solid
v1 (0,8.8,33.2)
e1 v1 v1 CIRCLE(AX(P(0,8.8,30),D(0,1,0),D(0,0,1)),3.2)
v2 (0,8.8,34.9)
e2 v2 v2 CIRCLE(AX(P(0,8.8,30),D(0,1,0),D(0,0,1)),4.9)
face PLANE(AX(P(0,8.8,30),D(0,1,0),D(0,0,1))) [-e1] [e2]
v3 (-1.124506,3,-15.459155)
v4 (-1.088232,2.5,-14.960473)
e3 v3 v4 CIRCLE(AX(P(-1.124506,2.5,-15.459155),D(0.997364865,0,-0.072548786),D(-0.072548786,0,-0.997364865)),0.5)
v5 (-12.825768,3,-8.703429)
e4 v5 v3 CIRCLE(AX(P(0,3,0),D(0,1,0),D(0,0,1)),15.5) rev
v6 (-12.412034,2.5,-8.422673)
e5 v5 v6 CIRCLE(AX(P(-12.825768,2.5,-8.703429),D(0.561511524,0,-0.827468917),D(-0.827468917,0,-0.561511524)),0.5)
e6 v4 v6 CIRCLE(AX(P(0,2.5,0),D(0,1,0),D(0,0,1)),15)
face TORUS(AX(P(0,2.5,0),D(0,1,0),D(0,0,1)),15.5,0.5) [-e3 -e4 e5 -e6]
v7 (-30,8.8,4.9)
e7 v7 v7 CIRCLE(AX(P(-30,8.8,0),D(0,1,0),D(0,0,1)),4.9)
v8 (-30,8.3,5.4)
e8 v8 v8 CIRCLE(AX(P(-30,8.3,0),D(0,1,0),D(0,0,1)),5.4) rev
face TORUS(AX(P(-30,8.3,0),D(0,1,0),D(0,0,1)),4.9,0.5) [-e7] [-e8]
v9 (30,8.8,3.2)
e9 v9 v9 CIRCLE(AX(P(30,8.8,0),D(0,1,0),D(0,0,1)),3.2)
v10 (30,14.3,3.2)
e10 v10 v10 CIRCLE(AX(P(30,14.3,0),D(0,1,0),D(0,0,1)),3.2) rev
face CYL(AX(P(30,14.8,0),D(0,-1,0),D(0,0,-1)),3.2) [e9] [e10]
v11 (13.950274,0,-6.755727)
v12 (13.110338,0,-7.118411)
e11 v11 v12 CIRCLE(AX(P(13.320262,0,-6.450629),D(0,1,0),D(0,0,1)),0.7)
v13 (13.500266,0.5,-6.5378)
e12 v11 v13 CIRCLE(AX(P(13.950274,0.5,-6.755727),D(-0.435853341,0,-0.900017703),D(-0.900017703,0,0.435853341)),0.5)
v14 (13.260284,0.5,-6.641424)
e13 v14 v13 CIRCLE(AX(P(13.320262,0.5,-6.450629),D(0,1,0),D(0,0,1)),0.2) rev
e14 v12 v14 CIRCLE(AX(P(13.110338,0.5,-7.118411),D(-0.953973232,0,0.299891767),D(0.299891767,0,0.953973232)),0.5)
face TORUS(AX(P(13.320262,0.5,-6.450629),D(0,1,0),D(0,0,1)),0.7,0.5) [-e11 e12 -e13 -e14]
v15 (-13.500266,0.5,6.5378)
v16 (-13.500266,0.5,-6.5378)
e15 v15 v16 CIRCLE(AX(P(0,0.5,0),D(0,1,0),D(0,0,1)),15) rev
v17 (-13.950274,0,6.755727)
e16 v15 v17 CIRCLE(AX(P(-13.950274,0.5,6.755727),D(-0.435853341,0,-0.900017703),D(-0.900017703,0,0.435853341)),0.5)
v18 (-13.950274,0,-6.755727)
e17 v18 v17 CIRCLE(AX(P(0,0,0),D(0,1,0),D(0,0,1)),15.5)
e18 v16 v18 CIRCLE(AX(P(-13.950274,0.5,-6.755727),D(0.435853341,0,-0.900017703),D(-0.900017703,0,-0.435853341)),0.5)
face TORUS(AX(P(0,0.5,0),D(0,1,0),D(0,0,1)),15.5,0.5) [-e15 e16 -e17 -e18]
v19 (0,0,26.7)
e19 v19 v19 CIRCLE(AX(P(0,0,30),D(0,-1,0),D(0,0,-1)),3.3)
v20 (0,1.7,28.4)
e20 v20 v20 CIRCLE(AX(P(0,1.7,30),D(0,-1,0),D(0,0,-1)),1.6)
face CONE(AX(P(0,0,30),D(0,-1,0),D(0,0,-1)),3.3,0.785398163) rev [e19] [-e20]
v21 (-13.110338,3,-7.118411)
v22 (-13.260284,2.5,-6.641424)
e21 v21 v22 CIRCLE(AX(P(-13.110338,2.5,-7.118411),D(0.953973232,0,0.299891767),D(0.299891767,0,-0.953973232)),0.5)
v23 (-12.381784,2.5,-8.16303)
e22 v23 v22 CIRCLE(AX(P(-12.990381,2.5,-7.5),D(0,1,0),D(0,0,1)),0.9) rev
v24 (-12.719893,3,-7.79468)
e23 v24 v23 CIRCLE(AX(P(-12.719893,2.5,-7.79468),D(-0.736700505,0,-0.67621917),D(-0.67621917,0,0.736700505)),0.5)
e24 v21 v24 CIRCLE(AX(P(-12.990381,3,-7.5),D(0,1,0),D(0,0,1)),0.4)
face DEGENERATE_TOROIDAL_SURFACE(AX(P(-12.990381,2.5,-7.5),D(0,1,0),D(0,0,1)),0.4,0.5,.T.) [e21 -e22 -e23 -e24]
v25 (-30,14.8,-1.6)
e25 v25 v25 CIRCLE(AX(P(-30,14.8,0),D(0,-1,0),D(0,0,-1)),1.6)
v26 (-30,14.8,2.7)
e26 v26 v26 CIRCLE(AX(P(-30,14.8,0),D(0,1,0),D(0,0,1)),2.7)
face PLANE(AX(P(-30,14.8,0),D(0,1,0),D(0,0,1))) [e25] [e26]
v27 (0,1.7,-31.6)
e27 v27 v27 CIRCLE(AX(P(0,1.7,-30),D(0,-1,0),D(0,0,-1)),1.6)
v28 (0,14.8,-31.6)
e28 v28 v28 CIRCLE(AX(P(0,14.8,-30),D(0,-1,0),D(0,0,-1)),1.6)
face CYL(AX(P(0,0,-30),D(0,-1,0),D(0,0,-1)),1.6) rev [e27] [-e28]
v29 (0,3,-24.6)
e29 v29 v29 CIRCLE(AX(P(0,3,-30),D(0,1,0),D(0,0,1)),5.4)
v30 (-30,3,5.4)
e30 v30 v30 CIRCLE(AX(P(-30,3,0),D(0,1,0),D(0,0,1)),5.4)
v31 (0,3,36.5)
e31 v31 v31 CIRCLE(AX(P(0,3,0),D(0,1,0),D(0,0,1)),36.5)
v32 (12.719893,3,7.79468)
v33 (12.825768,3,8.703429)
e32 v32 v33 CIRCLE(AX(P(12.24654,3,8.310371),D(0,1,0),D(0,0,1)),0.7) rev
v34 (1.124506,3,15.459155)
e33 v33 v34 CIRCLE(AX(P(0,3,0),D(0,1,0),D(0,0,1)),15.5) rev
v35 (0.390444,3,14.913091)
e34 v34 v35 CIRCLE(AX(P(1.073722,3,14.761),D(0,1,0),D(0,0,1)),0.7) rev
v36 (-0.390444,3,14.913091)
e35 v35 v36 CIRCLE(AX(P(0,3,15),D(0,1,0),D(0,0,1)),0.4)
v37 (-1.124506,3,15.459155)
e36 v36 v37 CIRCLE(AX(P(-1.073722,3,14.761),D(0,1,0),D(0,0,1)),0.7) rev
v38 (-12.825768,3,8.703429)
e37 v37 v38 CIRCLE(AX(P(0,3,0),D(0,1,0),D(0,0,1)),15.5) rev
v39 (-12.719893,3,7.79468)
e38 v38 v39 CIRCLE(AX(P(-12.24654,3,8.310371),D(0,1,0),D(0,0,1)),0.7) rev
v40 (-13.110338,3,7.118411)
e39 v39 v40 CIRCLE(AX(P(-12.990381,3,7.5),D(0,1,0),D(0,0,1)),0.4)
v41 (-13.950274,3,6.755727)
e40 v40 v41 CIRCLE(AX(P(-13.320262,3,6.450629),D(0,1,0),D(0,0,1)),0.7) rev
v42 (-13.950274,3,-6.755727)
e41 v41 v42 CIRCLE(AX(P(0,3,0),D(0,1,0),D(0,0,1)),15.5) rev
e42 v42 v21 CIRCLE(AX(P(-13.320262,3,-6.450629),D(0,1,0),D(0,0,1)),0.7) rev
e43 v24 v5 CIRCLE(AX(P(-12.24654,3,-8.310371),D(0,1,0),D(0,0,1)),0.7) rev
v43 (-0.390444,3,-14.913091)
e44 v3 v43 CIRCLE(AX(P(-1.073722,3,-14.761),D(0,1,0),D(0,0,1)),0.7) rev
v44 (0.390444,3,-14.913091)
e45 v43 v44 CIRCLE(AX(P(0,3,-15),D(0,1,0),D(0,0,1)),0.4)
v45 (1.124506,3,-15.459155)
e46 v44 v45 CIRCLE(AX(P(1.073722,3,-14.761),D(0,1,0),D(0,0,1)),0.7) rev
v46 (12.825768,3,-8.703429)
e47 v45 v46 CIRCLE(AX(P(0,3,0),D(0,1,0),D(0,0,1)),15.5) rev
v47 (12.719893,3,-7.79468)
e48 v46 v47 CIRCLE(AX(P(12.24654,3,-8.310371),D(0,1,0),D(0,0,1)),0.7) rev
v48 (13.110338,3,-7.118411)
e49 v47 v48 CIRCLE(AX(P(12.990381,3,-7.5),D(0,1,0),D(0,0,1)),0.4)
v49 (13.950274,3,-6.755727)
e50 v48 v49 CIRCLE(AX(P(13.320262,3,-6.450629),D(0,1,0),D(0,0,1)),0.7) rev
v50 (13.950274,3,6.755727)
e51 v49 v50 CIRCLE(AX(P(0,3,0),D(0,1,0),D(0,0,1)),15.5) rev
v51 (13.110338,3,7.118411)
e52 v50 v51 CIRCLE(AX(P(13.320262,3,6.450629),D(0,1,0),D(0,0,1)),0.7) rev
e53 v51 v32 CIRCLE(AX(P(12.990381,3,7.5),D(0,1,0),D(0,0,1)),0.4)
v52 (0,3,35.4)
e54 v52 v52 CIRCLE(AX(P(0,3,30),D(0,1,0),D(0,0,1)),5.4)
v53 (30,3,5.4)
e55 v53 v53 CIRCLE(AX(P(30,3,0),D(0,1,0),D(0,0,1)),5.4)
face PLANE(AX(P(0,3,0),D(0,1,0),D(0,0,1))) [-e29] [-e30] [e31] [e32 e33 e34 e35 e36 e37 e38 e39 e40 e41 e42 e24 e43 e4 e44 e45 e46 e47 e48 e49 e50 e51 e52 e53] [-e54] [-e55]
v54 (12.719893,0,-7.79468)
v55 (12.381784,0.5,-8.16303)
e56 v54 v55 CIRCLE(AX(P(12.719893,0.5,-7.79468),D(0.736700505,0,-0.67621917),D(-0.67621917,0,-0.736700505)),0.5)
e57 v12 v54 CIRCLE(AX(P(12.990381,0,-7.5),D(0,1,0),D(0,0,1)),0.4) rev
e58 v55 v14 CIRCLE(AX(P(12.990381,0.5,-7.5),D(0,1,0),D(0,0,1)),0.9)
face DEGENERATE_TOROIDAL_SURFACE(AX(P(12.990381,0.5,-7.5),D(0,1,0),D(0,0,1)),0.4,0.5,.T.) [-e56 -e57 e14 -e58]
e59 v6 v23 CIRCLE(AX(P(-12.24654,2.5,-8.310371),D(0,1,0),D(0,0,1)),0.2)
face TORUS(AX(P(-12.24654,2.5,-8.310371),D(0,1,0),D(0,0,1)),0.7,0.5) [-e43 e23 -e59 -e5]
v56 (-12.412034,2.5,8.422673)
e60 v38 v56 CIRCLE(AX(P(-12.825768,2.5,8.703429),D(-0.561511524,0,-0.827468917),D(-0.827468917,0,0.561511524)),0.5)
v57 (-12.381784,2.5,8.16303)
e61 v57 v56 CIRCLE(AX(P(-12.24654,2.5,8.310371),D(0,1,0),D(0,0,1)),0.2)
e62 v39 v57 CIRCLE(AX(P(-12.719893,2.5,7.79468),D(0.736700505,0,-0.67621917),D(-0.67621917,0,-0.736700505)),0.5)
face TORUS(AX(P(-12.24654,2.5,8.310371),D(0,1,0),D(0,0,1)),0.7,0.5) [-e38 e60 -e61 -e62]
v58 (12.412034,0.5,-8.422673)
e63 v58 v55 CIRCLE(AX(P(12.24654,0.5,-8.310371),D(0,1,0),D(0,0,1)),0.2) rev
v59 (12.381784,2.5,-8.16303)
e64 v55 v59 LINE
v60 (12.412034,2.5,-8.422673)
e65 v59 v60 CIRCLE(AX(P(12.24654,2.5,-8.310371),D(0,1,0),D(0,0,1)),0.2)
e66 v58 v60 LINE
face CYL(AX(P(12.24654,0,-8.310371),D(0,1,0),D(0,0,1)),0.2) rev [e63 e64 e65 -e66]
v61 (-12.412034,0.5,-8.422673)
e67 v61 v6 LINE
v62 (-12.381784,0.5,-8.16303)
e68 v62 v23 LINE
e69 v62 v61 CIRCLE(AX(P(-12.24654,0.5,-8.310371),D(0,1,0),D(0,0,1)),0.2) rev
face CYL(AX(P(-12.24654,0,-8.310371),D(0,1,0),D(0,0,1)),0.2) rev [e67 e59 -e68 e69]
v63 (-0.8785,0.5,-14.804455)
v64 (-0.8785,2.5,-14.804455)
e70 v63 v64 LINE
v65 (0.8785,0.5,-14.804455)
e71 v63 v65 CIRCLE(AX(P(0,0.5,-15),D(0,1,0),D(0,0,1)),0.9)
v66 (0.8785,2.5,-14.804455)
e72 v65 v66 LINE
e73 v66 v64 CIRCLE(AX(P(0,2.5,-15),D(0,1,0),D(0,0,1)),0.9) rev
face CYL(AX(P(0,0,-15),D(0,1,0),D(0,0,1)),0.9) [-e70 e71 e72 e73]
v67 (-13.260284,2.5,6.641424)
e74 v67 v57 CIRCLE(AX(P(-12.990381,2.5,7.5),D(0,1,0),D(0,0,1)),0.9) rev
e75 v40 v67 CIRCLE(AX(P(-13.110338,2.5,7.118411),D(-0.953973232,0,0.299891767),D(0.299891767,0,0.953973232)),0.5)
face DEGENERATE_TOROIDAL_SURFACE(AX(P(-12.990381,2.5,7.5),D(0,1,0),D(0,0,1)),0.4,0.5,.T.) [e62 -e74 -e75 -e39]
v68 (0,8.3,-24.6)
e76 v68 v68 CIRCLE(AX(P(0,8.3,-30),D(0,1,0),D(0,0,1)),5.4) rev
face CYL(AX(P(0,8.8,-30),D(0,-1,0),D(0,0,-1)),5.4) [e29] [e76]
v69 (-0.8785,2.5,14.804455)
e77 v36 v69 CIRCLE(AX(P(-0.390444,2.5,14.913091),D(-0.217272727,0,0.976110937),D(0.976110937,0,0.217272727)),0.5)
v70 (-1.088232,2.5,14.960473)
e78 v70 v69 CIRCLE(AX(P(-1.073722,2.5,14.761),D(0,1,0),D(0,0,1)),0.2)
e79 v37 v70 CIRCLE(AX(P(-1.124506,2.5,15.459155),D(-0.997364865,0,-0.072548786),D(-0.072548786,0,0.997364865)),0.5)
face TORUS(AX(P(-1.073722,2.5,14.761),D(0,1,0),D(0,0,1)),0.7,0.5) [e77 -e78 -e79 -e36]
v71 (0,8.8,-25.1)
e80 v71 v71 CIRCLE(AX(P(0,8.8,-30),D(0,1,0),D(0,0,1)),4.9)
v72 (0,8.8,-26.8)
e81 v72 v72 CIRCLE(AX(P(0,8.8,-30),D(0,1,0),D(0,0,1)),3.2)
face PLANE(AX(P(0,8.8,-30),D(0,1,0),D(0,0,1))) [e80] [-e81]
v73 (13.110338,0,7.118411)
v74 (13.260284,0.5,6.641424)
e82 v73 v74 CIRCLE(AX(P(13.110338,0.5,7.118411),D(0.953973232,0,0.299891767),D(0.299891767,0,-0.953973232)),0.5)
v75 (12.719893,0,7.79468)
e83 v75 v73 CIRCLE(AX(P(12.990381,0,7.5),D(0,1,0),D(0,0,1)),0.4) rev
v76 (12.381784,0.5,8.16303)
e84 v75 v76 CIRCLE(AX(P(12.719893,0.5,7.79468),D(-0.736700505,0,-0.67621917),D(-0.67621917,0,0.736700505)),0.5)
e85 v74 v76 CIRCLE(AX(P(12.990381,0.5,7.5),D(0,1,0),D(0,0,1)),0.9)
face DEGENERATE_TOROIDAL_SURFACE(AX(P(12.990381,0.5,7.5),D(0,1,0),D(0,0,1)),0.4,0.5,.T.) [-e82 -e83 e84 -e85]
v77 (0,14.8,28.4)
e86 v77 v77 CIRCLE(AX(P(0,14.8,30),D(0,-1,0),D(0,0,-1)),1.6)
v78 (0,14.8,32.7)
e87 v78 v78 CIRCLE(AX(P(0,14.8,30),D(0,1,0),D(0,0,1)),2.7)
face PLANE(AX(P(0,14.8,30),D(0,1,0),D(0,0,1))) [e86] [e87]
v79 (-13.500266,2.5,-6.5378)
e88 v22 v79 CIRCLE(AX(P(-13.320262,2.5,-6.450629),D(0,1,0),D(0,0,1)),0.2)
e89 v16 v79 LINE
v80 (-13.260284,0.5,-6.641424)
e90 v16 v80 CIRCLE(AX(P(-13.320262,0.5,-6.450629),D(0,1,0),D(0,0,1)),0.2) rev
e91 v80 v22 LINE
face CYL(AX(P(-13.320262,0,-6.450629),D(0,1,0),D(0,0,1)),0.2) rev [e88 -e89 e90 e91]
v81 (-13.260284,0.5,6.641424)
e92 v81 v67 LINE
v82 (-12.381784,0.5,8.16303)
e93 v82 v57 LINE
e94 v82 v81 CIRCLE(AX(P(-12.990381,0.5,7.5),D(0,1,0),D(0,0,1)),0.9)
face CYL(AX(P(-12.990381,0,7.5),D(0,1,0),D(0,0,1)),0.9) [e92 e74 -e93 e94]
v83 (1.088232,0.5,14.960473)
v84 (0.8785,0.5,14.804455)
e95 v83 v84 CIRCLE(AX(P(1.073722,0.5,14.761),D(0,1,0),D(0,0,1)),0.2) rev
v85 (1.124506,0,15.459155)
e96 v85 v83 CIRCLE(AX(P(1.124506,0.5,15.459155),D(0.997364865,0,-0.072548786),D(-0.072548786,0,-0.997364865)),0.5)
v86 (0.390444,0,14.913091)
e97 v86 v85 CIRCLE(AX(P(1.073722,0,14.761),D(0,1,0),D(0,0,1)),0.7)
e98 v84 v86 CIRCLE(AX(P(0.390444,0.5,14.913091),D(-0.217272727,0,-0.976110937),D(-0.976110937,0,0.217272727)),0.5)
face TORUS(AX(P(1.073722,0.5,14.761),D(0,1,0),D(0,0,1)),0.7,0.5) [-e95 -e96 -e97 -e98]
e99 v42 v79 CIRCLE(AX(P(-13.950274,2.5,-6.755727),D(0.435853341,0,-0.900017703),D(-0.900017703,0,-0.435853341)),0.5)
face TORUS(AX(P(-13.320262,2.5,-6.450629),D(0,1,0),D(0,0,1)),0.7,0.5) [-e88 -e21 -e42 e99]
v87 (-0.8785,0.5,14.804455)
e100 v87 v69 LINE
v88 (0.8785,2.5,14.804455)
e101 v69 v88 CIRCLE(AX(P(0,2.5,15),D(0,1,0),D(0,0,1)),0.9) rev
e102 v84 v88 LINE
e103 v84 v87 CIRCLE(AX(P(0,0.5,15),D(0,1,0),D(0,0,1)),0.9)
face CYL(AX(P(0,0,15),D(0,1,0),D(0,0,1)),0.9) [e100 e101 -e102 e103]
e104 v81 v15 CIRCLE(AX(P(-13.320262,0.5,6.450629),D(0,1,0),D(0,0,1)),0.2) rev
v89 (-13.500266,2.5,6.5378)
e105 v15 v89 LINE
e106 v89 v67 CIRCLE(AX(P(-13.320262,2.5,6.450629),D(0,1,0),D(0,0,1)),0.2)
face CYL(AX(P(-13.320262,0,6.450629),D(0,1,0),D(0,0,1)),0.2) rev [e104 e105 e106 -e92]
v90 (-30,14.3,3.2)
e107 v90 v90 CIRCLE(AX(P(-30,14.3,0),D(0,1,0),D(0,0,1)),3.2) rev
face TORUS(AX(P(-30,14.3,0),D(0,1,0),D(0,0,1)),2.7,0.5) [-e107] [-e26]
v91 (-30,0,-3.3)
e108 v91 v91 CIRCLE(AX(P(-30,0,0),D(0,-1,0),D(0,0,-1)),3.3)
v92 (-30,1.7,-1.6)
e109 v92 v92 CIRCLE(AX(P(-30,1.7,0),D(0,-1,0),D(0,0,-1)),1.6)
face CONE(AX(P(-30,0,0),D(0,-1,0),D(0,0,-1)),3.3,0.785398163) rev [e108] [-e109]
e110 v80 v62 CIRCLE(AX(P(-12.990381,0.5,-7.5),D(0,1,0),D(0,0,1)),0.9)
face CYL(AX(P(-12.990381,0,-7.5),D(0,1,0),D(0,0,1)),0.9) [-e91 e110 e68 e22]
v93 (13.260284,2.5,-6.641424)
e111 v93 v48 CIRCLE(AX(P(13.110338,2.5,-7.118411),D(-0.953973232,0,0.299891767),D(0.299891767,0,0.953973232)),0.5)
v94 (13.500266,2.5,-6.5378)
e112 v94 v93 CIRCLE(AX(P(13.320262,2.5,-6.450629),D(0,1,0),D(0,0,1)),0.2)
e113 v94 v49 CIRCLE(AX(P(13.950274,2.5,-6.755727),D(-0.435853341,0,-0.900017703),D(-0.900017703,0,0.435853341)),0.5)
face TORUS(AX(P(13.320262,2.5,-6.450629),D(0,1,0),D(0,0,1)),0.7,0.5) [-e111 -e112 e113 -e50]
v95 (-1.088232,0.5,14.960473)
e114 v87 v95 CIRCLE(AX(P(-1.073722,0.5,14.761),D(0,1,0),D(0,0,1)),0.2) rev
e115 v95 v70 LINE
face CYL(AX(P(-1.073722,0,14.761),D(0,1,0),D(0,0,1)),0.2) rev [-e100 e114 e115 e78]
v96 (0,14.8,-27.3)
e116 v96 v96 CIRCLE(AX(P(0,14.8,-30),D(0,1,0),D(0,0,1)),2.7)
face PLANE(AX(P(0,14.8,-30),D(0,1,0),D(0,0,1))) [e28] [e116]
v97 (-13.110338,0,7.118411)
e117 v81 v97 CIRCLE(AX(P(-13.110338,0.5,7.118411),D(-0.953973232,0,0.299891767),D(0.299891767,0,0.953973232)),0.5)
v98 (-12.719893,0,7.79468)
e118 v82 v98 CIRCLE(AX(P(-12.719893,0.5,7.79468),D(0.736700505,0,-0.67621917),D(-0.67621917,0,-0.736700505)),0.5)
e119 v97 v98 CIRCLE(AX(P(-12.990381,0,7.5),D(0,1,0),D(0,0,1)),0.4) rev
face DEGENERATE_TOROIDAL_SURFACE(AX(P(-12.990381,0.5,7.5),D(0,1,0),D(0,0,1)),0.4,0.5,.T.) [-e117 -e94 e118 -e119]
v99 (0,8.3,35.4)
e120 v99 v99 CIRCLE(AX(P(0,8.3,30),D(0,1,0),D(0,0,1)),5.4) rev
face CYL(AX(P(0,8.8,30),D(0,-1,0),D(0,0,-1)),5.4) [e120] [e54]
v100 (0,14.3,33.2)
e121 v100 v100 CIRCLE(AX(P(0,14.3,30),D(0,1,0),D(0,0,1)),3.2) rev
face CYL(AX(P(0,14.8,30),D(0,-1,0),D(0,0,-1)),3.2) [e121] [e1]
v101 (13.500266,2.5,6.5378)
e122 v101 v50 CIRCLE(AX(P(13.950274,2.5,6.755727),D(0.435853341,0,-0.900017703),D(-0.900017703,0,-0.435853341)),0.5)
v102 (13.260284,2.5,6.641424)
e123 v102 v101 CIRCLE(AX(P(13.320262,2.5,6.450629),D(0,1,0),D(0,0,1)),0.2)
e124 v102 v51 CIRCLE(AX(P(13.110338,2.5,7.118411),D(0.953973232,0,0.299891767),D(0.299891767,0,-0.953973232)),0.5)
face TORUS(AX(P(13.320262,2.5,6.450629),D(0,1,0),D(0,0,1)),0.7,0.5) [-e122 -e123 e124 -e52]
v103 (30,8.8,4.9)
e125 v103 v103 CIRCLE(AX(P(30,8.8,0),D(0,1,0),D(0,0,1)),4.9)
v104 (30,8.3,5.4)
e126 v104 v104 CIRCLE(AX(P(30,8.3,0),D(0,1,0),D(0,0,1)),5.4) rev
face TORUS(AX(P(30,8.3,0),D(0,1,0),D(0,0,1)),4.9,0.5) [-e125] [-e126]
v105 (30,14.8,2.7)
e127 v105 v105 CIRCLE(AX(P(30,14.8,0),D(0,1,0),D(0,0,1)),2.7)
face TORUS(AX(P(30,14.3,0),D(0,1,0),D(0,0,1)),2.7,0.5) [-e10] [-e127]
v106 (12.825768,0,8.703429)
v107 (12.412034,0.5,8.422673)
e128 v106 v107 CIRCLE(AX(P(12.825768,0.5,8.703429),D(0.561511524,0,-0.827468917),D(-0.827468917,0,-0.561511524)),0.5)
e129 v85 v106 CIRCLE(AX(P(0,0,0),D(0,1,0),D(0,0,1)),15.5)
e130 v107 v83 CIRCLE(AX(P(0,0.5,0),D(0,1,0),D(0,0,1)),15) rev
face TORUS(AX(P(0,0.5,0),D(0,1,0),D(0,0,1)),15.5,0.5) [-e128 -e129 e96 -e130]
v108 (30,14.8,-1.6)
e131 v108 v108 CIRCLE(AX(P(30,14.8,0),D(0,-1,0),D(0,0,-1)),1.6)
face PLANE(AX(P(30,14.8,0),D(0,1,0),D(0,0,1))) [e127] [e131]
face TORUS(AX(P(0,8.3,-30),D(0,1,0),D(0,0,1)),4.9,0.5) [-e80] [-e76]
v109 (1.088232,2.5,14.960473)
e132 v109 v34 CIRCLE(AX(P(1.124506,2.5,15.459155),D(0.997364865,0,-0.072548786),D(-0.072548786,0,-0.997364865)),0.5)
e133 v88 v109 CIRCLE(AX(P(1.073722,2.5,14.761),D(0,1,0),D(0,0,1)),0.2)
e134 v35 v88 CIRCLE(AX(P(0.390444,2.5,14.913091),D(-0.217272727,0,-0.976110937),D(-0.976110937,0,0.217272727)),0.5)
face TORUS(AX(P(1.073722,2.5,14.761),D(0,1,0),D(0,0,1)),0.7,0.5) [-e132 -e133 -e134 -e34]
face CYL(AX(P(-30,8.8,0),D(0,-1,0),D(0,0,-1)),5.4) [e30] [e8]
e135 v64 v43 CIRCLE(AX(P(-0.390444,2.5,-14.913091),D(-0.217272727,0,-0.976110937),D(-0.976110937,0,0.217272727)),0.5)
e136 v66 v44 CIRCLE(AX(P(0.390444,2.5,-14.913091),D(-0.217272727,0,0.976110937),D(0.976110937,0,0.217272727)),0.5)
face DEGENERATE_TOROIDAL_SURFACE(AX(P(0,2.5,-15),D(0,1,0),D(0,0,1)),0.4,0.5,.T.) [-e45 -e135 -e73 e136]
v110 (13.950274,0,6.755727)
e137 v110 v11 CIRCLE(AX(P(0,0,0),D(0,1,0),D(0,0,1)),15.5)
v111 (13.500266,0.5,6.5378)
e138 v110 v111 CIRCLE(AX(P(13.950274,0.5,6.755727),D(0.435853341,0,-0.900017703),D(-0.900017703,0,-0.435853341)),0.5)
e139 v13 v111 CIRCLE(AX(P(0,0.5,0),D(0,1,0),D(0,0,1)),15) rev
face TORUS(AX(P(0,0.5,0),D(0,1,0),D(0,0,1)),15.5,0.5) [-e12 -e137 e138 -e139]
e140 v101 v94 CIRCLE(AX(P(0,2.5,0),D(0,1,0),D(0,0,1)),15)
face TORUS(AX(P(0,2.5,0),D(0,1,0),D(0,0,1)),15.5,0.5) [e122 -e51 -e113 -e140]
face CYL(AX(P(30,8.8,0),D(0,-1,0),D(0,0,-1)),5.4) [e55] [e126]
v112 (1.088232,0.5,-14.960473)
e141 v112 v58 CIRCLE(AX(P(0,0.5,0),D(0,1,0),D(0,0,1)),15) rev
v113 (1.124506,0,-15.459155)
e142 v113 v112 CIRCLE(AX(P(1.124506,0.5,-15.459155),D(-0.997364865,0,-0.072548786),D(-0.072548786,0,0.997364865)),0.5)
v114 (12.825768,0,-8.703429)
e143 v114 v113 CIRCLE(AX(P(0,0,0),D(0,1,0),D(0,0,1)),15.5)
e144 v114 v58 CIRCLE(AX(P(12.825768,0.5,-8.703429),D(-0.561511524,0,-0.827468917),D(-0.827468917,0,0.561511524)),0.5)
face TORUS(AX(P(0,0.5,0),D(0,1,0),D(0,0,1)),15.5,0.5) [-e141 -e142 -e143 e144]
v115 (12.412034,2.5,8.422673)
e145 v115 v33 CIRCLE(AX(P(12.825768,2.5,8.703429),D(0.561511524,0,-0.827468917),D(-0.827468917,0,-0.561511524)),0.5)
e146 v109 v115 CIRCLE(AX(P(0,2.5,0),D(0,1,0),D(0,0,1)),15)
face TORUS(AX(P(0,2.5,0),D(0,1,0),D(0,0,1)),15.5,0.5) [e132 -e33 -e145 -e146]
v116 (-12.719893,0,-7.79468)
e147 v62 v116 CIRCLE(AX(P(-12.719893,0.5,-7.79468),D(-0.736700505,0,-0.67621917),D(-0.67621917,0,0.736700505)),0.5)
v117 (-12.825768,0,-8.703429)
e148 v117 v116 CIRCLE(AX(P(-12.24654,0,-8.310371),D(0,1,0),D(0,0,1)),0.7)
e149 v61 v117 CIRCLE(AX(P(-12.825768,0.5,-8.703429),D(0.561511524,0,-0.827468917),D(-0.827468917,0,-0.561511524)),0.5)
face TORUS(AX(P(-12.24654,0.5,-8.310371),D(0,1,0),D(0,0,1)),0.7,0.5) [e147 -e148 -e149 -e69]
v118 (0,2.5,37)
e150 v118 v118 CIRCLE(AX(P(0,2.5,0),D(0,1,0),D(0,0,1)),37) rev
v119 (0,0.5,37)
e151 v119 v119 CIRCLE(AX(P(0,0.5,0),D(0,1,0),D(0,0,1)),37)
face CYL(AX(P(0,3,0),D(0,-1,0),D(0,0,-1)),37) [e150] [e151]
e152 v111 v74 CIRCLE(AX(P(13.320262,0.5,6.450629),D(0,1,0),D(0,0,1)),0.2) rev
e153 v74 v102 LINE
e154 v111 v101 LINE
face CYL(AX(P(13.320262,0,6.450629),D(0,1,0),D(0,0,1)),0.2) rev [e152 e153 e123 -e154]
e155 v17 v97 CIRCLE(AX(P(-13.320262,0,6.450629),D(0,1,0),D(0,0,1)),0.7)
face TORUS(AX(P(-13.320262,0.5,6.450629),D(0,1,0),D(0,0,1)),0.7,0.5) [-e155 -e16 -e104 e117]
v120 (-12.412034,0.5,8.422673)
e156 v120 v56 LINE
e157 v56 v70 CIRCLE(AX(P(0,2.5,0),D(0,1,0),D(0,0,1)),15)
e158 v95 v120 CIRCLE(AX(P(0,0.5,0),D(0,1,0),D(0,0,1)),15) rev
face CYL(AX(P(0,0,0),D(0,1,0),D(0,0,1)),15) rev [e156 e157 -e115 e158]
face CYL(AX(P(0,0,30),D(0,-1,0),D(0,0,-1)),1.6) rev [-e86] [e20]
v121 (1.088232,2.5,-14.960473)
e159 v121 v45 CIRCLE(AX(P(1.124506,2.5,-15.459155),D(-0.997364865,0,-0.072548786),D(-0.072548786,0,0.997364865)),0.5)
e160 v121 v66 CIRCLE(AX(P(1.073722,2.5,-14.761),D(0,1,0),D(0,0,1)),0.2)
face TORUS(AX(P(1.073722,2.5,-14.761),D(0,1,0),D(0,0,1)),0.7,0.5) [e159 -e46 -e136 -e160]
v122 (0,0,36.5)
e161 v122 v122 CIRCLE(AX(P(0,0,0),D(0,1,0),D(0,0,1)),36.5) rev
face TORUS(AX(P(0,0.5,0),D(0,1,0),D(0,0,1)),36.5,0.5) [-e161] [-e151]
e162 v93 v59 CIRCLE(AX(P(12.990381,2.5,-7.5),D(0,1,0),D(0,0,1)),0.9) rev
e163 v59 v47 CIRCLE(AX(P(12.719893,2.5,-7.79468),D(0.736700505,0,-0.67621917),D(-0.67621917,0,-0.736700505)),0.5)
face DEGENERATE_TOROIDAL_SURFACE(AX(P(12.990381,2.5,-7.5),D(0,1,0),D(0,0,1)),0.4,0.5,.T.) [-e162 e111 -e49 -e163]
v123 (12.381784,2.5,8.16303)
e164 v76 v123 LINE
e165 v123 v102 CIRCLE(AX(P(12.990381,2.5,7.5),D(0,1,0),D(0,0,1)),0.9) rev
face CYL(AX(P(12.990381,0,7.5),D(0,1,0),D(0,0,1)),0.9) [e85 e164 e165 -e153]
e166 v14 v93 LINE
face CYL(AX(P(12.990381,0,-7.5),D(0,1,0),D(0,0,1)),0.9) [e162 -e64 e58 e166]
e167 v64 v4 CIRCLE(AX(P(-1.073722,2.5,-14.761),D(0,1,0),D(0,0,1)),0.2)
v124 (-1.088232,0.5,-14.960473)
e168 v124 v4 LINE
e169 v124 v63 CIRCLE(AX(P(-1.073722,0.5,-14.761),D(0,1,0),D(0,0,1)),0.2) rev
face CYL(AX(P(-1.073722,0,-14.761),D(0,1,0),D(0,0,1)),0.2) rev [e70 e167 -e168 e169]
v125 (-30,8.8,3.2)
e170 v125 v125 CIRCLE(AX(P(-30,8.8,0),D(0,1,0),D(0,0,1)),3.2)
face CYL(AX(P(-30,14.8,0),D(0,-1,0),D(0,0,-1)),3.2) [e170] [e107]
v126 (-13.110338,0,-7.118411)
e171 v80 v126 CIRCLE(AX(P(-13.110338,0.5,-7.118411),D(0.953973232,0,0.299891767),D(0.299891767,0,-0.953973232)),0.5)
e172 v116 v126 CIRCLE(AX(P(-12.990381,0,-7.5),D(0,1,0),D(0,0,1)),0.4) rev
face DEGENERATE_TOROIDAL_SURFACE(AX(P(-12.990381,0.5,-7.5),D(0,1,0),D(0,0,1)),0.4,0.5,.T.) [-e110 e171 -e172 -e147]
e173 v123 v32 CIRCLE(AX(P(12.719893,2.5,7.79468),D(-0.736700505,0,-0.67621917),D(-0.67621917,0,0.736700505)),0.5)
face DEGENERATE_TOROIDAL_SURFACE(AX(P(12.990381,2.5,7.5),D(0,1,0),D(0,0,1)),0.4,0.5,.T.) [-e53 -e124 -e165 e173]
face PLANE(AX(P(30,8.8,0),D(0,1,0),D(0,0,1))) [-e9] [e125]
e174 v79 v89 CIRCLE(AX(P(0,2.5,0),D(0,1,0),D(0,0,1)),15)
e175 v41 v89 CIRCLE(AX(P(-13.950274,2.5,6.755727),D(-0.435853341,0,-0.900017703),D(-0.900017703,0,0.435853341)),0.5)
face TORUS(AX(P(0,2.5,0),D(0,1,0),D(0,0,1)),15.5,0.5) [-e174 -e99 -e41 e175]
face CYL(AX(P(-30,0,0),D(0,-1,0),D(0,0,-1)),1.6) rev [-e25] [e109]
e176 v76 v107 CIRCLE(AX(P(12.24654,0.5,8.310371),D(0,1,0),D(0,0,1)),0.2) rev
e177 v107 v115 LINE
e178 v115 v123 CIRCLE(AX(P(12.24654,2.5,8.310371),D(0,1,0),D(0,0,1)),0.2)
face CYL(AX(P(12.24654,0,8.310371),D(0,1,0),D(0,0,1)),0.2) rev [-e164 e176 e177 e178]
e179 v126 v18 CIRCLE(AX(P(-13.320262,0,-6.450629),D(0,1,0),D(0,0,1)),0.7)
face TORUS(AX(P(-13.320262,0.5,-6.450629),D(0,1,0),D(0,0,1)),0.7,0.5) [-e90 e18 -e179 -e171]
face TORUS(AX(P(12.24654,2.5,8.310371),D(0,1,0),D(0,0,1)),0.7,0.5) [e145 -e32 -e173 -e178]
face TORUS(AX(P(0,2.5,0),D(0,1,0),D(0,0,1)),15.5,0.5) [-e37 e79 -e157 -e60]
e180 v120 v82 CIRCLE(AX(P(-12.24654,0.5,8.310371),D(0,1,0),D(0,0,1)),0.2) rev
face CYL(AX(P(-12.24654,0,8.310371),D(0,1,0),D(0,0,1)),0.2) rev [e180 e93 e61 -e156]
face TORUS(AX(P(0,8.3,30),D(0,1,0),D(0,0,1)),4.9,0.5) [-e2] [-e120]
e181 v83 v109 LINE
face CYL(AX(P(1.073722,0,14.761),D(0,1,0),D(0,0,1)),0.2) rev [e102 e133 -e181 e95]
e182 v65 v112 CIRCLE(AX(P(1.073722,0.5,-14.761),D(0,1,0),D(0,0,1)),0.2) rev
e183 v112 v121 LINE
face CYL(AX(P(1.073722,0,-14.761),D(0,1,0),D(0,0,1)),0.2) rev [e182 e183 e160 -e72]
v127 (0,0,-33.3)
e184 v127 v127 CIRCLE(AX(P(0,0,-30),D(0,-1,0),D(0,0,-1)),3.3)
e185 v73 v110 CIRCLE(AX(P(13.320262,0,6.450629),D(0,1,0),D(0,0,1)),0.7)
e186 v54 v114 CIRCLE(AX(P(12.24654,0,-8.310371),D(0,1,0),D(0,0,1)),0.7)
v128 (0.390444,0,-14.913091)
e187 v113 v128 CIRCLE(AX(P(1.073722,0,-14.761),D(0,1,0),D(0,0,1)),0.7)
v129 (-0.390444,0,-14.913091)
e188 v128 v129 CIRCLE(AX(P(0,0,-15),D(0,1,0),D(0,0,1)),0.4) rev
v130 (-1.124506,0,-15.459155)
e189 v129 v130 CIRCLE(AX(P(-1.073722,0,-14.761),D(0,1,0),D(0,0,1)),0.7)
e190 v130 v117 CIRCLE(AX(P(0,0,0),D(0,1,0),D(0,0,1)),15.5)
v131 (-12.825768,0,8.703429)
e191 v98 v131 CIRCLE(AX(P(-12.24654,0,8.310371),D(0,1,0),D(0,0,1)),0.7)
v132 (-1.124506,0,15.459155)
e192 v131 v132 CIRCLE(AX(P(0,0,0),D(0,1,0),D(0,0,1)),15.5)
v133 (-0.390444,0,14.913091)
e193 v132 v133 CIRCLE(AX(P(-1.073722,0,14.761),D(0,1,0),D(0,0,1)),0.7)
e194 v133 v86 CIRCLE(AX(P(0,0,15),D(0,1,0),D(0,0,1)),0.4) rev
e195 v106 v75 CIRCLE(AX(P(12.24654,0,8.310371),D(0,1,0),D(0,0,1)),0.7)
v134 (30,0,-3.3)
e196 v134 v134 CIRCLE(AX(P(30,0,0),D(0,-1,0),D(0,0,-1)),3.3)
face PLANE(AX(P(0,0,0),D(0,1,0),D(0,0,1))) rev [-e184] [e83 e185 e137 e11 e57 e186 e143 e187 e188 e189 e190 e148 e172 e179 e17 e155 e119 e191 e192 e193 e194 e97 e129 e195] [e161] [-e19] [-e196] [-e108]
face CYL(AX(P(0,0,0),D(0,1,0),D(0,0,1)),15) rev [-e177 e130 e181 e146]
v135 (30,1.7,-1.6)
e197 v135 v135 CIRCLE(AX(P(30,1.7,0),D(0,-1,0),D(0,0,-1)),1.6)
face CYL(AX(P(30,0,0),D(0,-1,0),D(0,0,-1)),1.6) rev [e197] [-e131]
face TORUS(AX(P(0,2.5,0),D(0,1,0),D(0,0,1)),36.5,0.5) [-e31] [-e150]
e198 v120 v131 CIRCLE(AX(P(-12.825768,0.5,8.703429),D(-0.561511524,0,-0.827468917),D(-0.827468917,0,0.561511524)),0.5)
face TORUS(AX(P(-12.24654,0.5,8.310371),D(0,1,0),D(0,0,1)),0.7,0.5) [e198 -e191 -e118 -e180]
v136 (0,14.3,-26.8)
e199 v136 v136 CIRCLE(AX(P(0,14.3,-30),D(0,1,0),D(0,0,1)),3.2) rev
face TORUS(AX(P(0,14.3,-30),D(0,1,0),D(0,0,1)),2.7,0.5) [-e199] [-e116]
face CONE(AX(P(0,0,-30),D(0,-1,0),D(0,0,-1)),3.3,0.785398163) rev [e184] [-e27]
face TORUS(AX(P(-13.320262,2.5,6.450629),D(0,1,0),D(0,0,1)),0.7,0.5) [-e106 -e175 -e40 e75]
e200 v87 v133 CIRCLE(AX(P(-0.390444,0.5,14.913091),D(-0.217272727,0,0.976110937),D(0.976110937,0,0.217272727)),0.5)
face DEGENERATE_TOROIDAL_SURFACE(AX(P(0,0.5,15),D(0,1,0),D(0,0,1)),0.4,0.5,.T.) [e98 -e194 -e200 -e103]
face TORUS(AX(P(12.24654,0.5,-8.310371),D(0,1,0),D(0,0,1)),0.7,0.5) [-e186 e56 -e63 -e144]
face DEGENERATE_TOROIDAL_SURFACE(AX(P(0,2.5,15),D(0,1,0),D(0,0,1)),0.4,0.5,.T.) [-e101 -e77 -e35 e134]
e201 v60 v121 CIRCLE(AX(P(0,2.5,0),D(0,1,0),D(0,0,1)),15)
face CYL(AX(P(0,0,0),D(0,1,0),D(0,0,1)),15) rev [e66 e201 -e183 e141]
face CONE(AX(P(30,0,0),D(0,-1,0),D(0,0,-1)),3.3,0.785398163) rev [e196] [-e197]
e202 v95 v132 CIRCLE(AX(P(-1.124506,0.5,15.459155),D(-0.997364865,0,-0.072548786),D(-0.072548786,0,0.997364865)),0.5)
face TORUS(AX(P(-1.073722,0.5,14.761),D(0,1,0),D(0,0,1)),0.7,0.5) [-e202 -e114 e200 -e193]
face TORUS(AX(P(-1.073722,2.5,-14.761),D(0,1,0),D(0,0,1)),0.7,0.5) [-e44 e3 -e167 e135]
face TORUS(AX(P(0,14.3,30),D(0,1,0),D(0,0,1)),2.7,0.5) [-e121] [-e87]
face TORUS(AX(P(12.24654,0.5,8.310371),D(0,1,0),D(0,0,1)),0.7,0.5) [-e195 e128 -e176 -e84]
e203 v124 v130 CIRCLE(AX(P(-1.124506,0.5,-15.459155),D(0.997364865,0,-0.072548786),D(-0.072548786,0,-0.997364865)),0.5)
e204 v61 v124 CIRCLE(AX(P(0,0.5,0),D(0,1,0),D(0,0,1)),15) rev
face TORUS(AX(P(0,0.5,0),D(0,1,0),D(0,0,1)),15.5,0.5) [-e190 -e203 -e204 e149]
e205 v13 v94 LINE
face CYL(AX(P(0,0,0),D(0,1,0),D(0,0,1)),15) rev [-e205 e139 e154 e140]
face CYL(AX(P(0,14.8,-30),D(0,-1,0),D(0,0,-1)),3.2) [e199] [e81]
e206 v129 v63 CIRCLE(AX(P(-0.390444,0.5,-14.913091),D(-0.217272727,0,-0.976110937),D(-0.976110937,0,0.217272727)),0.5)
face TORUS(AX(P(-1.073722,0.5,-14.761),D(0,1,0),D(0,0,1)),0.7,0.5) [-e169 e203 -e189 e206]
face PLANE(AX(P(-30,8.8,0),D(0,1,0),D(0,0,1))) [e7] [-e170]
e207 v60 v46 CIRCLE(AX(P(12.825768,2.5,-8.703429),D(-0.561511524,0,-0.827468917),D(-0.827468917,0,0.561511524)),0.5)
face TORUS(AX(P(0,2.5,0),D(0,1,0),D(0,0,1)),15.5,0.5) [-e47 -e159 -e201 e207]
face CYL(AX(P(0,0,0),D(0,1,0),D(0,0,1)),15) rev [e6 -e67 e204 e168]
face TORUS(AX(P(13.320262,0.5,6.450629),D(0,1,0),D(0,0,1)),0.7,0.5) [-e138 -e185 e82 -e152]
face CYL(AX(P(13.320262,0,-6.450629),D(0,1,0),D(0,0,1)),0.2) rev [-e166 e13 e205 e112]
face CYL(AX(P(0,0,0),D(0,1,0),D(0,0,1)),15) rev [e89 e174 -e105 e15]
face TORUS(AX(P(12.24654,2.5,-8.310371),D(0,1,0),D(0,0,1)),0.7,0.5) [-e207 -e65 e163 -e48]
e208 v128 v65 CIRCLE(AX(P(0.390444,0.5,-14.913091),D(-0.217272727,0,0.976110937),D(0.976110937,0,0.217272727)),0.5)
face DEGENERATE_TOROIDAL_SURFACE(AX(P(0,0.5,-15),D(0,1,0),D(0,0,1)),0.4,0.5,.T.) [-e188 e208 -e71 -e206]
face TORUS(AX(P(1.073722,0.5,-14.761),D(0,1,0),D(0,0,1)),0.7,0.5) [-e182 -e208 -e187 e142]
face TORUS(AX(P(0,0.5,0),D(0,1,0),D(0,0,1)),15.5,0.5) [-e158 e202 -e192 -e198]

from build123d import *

# Parameters (mm, degrees)
SKETCH_1_R               = 37
EXTRUDE_1_DEPTH          = 3
CUT_EXTRUDE_1_DEPTH      = 53.411830726
SKETCH_3_R               = 5.4
EXTRUDE_2_DEPTH          = 5.8
SKETCH_4_R               = 3.2
EXTRUDE_3_DEPTH          = 6
PATTERN_CIRCULAR_1_COUNT = 4
FILLET_1_R               = 0.5
FILLET_2_R               = 0.5


# Read off the part's stored shape, not the designer's step: 高级异型孔1
with BuildPart() as part:
    # 草图1 → 凸台-拉伸1 (new body)
    with BuildSketch(Plane(origin=(0, 0, 0), x_dir=(1, 0, 0), z_dir=(0, 1, 0))):
        with Locations(Location((0, 0, 0), (0, 0, 270))):
            Circle(SKETCH_1_R)
    extrude(amount=EXTRUDE_1_DEPTH)

    # 草图2 → 切除-拉伸1 (cut, through all)
    with BuildSketch(Plane(origin=(0, 3, 0), x_dir=(1, 0, 0), z_dir=(0, 1, 0))):
        with BuildLine():
            ThreePointArc((-1.088231788, 14.960472973), (-7.5, 12.990381057), (-12.412033753, 8.42267286))
            ThreePointArc((-12.412033753, 8.42267286), (-12.445196264, 8.287225866), (-12.381783804, 8.163030455))
            ThreePointArc((-12.381783804, 8.163030455), (-12.210958193, 7.05), (-13.260283647, 6.641424091))
            ThreePointArc((-13.260283647, 6.641424091), (-13.399546259, 6.634243187), (-13.500265541, 6.537800113))
            ThreePointArc((-13.500265541, 6.537800113), (-15, 0), (-13.500265541, -6.537800113))
            ThreePointArc((-13.500265541, -6.537800113), (-13.399546259, -6.634243187), (-13.260283647, -6.641424091))
            ThreePointArc((-13.260283647, -6.641424091), (-12.210958193, -7.05), (-12.381783804, -8.163030455))
            ThreePointArc((-12.381783804, -8.163030455), (-12.445196264, -8.287225866), (-12.412033753, -8.42267286))
            ThreePointArc((-12.412033753, -8.42267286), (-7.5, -12.990381057), (-1.088231788, -14.960472973))
            ThreePointArc((-1.088231788, -14.960472973), (-0.954349995, -14.921469053), (-0.878499844, -14.804454545))
            ThreePointArc((-0.878499844, -14.804454545), (0, -14.1), (0.878499844, -14.804454545))
            ThreePointArc((0.878499844, -14.804454545), (0.954349995, -14.921469053), (1.088231788, -14.960472973))
            ThreePointArc((1.088231788, -14.960472973), (7.5, -12.990381057), (12.412033753, -8.42267286))
            ThreePointArc((12.412033753, -8.42267286), (12.445196264, -8.287225866), (12.381783804, -8.163030455))
            ThreePointArc((12.381783804, -8.163030455), (12.210958193, -7.05), (13.260283647, -6.641424091))
            ThreePointArc((13.260283647, -6.641424091), (13.399546259, -6.634243187), (13.500265541, -6.537800113))
            ThreePointArc((13.500265541, -6.537800113), (15, 0), (13.500265541, 6.537800113))
            ThreePointArc((13.500265541, 6.537800113), (13.399546259, 6.634243187), (13.260283647, 6.641424091))
            ThreePointArc((13.260283647, 6.641424091), (12.210958193, 7.05), (12.381783804, 8.163030455))
            ThreePointArc((12.381783804, 8.163030455), (12.445196264, 8.287225866), (12.412033753, 8.42267286))
            ThreePointArc((12.412033753, 8.42267286), (7.5, 12.990381057), (1.088231788, 14.960472973))
            ThreePointArc((1.088231788, 14.960472973), (0.954349995, 14.921469053), (0.878499844, 14.804454545))
            ThreePointArc((0.878499844, 14.804454545), (0, 14.1), (-0.878499844, 14.804454545))
            ThreePointArc((-0.878499844, 14.804454545), (-0.954349995, 14.921469053), (-1.088231788, 14.960472973))
        make_face()
    extrude(amount=-CUT_EXTRUDE_1_DEPTH, mode=Mode.SUBTRACT)

    # 草图3 → 凸台-拉伸2 (add)
    with BuildSketch(Plane(origin=(0, 3, 0), x_dir=(1, 0, 0), z_dir=(0, 1, 0))):
        with Locations(Location((0, 30, 0), (0, 0, 270))):
            Circle(SKETCH_3_R)
        with Locations(Location((30, 0, 0), (0, 0, 270))):
            Circle(SKETCH_3_R)
        with Locations(Location((0, -30, 0), (0, 0, 270))):
            Circle(SKETCH_3_R)
        with Locations(Location((-30, 0, 0), (0, 0, 270))):
            Circle(SKETCH_3_R)
    extrude(amount=EXTRUDE_2_DEPTH)

    # 草图4 → 凸台-拉伸3 (add)
    with BuildSketch(Plane(origin=(0, 8.8, 0), x_dir=(1, 0, 0), z_dir=(0, 1, 0))):
        with Locations(Location((0, 30, 0), (0, 0, 270))):
            Circle(SKETCH_4_R)
        with Locations(Location((30, 0, 0), (0, 0, 270))):
            Circle(SKETCH_4_R)
        with Locations(Location((0, -30, 0), (0, 0, 270))):
            Circle(SKETCH_4_R)
        with Locations(Location((-30, 0, 0), (0, 0, 270))):
            Circle(SKETCH_4_R)
    extrude(amount=EXTRUDE_3_DEPTH)

    # 高级异型孔1 outline → 高级异型孔1 (revolve, cut)
    with BuildSketch(Plane.XY.offset(30)):
        Polygon((0, 0), (3.3, 0), (1.6, 1.7), (1.6, 14.8), (0, 14.8), align=None)
    other_1 = revolve(axis=Axis((0, 0, 30), (0, 1, 0)), mode=Mode.SUBTRACT)

    # 阵列(圆周)1: 高级异型孔1 ×4 about axis
    pattern_circular_1_axis = Axis((0, 0, 0), (0, 1, 0))
    for i in range(1, PATTERN_CIRCULAR_1_COUNT):
        add(other_1.rotate(pattern_circular_1_axis, i * 360 / PATTERN_CIRCULAR_1_COUNT), mode=Mode.SUBTRACT)

    # 圆角1
    fillet_1_edges = [part.edges().sort_by_distance(p)[0] for p in [
        (0.954349995, 0, -14.921469053),
        (7.5, 0, -12.990381057),
        (12.445196264, 0, -8.287225866),
        (12.210958193, 0, -7.05),
        (13.399546259, 0, -6.634243187),
        (15, 0, 0),
        (13.399546259, 0, 6.634243187),
        (12.210958193, 0, 7.05),
        (12.445196264, 0, 8.287225866),
        (7.5, 0, 12.990381057),
        (0.954349995, 0, 14.921469053),
        (0, 0, 14.1),
        (-0.954349995, 0, 14.921469053),
        (-7.5, 0, 12.990381057),
        (-12.445196264, 0, 8.287225866),
        (-12.210958193, 0, 7.05),
        (-13.399546259, 0, 6.634243187),
        (-15, 0, 0),
        (-13.399546259, 0, -6.634243187),
        (-12.210958193, 0, -7.05),
        (-12.445196264, 0, -8.287225866),
        (-7.5, 0, -12.990381057),
        (-0.954349995, 0, -14.921469053),
        (0, 0, -14.1),
        (0.954349995, 3, -14.921469053),
        (0, 3, -14.1),
        (-0.954349995, 3, -14.921469053),
        (-7.5, 3, -12.990381057),
        (-12.445196264, 3, -8.287225866),
        (-12.210958193, 3, -7.05),
        (-13.399546259, 3, -6.634243187),
        (-15, 3, 0),
        (-13.399546259, 3, 6.634243187),
        (-12.210958193, 3, 7.05),
        (-12.445196264, 3, 8.287225866),
        (-7.5, 3, 12.990381057),
        (-0.954349995, 3, 14.921469053),
        (0, 3, 14.1),
        (0.954349995, 3, 14.921469053),
        (7.5, 3, 12.990381057),
        (12.445196264, 3, 8.287225866),
        (12.210958193, 3, 7.05),
        (13.399546259, 3, 6.634243187),
        (15, 3, 0),
        (13.399546259, 3, -6.634243187),
        (12.210958193, 3, -7.05),
        (12.445196264, 3, -8.287225866),
        (7.5, 3, -12.990381057),
    ]]
    fillet(fillet_1_edges, radius=FILLET_1_R)

    # 圆角2
    fillet_2_edges = [part.edges().sort_by_distance(p)[0] for p in [
        (0, 14.8, -33.2),
        (30, 14.8, -3.2),
        (0, 14.8, 26.8),
        (-30, 14.8, -3.2),
        (0, 0, -37),
        (0, 3, -37),
        (0, 8.8, -35.4),
        (30, 8.8, -5.4),
        (0, 8.8, 24.6),
        (-30, 8.8, -5.4),
    ]]
    fillet(fillet_2_edges, radius=FILLET_2_R)


solid = part.part
